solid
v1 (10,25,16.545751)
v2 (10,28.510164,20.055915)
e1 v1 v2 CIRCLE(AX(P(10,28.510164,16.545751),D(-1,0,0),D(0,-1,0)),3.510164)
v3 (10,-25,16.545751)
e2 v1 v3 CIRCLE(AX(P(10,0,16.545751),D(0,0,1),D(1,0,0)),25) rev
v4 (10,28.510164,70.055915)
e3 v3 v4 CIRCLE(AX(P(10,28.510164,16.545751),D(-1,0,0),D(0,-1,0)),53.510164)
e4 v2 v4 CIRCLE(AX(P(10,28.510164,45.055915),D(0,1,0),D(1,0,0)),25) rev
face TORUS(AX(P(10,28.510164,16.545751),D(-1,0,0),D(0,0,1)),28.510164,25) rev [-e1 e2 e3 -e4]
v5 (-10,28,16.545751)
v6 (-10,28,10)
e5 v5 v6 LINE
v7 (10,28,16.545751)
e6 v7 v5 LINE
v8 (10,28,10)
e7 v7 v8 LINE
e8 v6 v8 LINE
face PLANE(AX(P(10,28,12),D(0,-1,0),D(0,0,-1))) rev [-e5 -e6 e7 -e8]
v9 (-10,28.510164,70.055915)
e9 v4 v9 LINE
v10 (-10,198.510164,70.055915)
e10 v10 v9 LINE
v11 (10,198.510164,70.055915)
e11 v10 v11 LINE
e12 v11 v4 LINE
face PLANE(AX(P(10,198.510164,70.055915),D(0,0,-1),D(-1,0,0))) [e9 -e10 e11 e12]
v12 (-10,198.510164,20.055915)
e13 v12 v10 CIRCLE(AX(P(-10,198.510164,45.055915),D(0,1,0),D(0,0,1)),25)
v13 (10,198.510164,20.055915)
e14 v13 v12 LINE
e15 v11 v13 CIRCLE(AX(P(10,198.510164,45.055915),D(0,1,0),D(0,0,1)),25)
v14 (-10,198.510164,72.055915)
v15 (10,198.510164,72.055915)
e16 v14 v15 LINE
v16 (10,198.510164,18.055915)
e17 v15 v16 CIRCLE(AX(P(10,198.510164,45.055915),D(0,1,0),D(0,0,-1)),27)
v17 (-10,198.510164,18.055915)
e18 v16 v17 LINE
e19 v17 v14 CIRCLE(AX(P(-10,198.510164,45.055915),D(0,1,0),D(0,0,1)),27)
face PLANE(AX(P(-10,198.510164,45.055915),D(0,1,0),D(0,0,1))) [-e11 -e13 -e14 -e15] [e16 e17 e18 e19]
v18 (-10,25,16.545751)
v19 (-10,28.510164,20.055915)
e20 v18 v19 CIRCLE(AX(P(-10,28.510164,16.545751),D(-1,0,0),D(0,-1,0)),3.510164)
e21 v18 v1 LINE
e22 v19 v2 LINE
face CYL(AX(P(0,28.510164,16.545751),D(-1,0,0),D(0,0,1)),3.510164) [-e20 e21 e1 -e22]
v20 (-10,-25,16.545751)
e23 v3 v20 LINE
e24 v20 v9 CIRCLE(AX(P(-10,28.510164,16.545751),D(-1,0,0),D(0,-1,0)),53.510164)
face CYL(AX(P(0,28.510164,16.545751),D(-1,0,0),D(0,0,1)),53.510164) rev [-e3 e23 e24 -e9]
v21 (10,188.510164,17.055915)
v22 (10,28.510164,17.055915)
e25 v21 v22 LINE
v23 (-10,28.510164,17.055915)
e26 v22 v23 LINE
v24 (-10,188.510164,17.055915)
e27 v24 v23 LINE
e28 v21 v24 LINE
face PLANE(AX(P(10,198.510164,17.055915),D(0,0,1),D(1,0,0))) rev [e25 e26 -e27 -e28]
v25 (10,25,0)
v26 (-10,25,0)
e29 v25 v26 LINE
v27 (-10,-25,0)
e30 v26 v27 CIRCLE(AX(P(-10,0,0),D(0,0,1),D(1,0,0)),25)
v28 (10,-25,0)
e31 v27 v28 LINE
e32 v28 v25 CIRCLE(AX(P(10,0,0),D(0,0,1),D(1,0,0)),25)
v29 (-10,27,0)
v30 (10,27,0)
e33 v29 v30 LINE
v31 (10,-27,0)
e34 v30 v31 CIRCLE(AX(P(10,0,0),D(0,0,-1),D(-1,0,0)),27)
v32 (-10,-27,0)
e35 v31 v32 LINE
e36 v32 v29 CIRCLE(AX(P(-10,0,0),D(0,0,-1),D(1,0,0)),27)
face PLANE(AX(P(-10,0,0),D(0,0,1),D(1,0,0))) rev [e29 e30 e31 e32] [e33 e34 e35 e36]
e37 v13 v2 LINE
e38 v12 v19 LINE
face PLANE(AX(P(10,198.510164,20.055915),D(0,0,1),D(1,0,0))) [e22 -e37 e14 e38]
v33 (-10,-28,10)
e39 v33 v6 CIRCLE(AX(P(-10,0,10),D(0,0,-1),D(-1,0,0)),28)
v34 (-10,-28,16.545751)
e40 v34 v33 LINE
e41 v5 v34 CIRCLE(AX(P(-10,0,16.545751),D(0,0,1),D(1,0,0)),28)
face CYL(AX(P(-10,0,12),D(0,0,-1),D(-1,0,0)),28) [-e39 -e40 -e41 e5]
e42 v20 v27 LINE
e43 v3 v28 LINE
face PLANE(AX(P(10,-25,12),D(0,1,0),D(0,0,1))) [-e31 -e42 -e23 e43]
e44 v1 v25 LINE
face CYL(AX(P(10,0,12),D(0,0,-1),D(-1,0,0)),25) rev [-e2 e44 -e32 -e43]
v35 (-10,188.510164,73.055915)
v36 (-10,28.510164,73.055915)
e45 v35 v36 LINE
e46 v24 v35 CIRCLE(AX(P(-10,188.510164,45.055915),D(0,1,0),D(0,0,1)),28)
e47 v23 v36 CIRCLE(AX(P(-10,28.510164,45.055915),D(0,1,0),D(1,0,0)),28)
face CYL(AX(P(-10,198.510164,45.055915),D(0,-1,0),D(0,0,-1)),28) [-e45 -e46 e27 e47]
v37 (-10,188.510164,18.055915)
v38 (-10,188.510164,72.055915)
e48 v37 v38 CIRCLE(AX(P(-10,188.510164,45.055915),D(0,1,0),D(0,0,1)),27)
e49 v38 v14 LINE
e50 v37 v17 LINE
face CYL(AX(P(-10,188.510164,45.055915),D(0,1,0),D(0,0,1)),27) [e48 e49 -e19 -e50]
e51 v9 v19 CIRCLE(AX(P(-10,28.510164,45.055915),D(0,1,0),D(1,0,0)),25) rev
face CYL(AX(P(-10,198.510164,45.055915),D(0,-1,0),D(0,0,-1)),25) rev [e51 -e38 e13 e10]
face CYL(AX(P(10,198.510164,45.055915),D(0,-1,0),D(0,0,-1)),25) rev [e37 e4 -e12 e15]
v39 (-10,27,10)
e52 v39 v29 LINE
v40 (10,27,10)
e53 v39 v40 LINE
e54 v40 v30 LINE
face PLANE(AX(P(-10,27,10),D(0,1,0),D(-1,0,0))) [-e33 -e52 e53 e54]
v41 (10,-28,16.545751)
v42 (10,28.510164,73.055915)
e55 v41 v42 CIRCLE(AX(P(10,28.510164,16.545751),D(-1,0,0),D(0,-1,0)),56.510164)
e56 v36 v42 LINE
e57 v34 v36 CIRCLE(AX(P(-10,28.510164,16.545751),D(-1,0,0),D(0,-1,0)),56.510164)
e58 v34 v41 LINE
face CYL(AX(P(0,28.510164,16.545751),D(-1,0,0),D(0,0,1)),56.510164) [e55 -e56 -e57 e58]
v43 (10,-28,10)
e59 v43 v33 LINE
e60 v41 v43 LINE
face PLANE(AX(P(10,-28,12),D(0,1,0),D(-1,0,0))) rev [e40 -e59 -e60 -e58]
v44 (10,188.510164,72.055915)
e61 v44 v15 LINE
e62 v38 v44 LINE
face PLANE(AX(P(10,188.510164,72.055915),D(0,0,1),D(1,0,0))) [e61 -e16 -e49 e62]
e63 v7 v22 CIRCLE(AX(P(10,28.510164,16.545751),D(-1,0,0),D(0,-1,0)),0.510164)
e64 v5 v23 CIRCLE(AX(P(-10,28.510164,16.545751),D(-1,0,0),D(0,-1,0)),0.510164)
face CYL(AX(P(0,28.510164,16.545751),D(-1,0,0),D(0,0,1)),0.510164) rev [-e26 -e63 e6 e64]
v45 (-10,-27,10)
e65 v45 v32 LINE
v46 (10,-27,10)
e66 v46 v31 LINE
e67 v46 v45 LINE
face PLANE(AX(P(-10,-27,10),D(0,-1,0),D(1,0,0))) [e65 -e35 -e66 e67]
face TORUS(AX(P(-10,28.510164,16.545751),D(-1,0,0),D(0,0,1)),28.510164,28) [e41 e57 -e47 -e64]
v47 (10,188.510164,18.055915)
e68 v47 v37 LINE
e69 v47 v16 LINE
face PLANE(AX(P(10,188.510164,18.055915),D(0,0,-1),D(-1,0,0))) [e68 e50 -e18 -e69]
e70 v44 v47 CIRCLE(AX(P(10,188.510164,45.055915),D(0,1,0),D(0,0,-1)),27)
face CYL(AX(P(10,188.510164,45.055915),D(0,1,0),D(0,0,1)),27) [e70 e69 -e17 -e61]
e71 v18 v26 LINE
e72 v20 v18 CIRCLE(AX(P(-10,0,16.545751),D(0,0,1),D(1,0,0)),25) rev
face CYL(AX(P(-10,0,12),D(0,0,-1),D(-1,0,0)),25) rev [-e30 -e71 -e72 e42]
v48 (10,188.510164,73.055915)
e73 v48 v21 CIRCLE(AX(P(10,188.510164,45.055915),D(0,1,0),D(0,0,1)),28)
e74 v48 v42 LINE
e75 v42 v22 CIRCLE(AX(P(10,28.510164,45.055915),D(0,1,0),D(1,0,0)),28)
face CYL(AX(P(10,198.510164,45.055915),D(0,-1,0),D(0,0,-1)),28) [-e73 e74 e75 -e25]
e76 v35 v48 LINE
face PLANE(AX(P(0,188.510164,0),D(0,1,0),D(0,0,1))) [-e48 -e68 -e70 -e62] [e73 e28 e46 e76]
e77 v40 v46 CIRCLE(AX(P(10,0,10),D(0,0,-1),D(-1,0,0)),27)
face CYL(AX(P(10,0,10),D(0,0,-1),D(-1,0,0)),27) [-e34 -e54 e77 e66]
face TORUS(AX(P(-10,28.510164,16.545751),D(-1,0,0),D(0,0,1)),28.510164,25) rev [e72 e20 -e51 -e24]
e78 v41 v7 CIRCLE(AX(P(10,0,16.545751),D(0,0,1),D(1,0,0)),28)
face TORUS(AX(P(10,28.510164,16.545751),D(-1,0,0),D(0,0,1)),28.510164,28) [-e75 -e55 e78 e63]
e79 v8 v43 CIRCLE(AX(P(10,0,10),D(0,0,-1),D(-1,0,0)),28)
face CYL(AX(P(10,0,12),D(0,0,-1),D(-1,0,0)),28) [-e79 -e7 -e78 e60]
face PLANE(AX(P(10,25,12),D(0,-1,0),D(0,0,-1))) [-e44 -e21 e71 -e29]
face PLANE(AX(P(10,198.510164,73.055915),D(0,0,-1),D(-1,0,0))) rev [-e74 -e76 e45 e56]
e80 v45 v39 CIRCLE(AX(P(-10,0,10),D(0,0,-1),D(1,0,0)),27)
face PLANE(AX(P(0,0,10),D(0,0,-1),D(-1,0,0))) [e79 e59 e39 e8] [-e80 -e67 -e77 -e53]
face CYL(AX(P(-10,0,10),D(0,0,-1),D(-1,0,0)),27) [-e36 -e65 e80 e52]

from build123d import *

# Parameters (mm, degrees)
BOSS_EXTRUDE1_DEPTH = 12
SWEEP1_START        = 12
SWEEP1_DEPTH        = 4.545750983
SWEEP1_2_ANGLE      = 90
BOSS_EXTRUDE2_DEPTH = 170
SKETCH11_W          = 78
SKETCH11_H          = 58
CUT_EXTRUDE14_DEPTH = 10
SKETCH12_W          = 78
SKETCH12_H          = 58
CUT_EXTRUDE15_DEPTH = 10


with BuildPart() as part:
    # Sketch1 → Boss-Extrude1 (new body)
    with BuildSketch(Plane.XY):
        with BuildLine():
            Line((10, -28), (-10, -28))
            ThreePointArc((-10, -28), (-38, 0), (-10, 28))
            Line((-10, 28), (10, 28))
            ThreePointArc((10, 28), (38, 0), (10, -28))
        make_face()
        with BuildLine():
            Line((10, -25), (-10, -25))
            ThreePointArc((-10, -25), (-35, 0), (-10, 25))
            Line((-10, 25), (10, 25))
            ThreePointArc((10, 25), (35, 0), (10, -25))
        make_face(mode=Mode.SUBTRACT)
    extrude(amount=BOSS_EXTRUDE1_DEPTH)

    # Sweep1: read off the stored shape, not the designer's step
    # Sweep1 outline → Sweep1 (add)
    with BuildSketch(Plane.XY.offset(SWEEP1_START)):
        with BuildLine():
            ThreePointArc((-10, 28), (-38, 0), (-10, -28))
            Line((-10, -28), (10, -28))
            ThreePointArc((10, -28), (38, 0), (10, 28))
            Line((10, 28), (-10, 28))
        make_face()
        with BuildLine():
            Line((10, -25), (-10, -25))
            ThreePointArc((-10, -25), (-35, 0), (-10, 25))
            Line((-10, 25), (10, 25))
            ThreePointArc((10, 25), (35, 0), (10, -25))
        make_face(mode=Mode.SUBTRACT)
    extrude(amount=SWEEP1_DEPTH)

    # Sweep1 2 outline → Sweep1 2 (revolve)
    with BuildSketch(Plane(origin=(0, 28.510163598, 16.545750983), x_dir=(0, 0, 1), z_dir=(0, 1, 0))):
        with BuildLine():
            Line((0.510163598, 10), (0.510163598, -10))
            ThreePointArc((0.510163598, -10), (28.510163598, -38), (56.510163598, -10))
            Line((56.510163598, -10), (56.510163598, 10))
            ThreePointArc((56.510163598, 10), (28.510163598, 38), (0.510163598, 10))
        make_face()
        with BuildLine():
            Line((3.510163598, -10), (3.510163598, 10))
            ThreePointArc((3.510163598, 10), (28.510163598, 35), (53.510163598, 10))
            Line((53.510163598, 10), (53.510163598, -10))
            ThreePointArc((53.510163598, -10), (28.510163598, -35), (3.510163598, -10))
        make_face(mode=Mode.SUBTRACT)
    revolve(axis=Axis((0, 28.510163598, 16.545750983), (1, 0, 0)), revolution_arc=SWEEP1_2_ANGLE)

    # Sketch6 → Boss-Extrude2 (add)
    with BuildSketch(Plane(origin=(0, 28.510163598, 0), x_dir=(1, 0, 0), z_dir=(0, 1, 0))):
        with BuildLine():
            Line((10, -73.055914581), (-10, -73.055914581))
            ThreePointArc((-10, -73.055914581), (-38, -45.055914581), (-10, -17.055914581))
            Line((-10, -17.055914581), (10, -17.055914581))
            ThreePointArc((10, -17.055914581), (38, -45.055914581), (10, -73.055914581))
        make_face()
        with BuildLine():
            Line((10, -70.055914581), (-10, -70.055914581))
            ThreePointArc((-10, -70.055914581), (-35, -45.055914581), (-10, -20.055914581))
            Line((-10, -20.055914581), (10, -20.055914581))
            ThreePointArc((10, -20.055914581), (35, -45.055914581), (10, -70.055914581))
        make_face(mode=Mode.SUBTRACT)
    extrude(amount=BOSS_EXTRUDE2_DEPTH)

    # Sketch11 → Cut-Extrude14 (cut)
    with BuildSketch(Plane(origin=(0, 0, 0), x_dir=(-1, 0, 0), z_dir=(0, 0, -1))):
        Rectangle(SKETCH11_W, SKETCH11_H)
        with BuildLine():
            Line((10, -27), (-10, -27))
            ThreePointArc((-10, -27), (-37, 0), (-10, 27))
            Line((-10, 27), (10, 27))
            ThreePointArc((10, 27), (37, 0), (10, -27))
        make_face(mode=Mode.SUBTRACT)
    extrude(amount=-CUT_EXTRUDE14_DEPTH, mode=Mode.SUBTRACT)

    # Sketch12 → Cut-Extrude15 (cut)
    with BuildSketch(Plane(origin=(0, 198.510163598, 0), x_dir=(1, 0, 0), z_dir=(0, 1, 0))):
        with Locations((0, -45.055914581)):
            Rectangle(SKETCH12_W, SKETCH12_H)
        with BuildLine():
            Line((10, -72.055914581), (-10, -72.055914581))
            ThreePointArc((-10, -72.055914581), (-37, -45.055914581), (-10, -18.055914581))
            Line((-10, -18.055914581), (10, -18.055914581))
            ThreePointArc((10, -18.055914581), (37, -45.055914581), (10, -72.055914581))
        make_face(mode=Mode.SUBTRACT)
    extrude(amount=-CUT_EXTRUDE15_DEPTH, mode=Mode.SUBTRACT)


solid = part.part
